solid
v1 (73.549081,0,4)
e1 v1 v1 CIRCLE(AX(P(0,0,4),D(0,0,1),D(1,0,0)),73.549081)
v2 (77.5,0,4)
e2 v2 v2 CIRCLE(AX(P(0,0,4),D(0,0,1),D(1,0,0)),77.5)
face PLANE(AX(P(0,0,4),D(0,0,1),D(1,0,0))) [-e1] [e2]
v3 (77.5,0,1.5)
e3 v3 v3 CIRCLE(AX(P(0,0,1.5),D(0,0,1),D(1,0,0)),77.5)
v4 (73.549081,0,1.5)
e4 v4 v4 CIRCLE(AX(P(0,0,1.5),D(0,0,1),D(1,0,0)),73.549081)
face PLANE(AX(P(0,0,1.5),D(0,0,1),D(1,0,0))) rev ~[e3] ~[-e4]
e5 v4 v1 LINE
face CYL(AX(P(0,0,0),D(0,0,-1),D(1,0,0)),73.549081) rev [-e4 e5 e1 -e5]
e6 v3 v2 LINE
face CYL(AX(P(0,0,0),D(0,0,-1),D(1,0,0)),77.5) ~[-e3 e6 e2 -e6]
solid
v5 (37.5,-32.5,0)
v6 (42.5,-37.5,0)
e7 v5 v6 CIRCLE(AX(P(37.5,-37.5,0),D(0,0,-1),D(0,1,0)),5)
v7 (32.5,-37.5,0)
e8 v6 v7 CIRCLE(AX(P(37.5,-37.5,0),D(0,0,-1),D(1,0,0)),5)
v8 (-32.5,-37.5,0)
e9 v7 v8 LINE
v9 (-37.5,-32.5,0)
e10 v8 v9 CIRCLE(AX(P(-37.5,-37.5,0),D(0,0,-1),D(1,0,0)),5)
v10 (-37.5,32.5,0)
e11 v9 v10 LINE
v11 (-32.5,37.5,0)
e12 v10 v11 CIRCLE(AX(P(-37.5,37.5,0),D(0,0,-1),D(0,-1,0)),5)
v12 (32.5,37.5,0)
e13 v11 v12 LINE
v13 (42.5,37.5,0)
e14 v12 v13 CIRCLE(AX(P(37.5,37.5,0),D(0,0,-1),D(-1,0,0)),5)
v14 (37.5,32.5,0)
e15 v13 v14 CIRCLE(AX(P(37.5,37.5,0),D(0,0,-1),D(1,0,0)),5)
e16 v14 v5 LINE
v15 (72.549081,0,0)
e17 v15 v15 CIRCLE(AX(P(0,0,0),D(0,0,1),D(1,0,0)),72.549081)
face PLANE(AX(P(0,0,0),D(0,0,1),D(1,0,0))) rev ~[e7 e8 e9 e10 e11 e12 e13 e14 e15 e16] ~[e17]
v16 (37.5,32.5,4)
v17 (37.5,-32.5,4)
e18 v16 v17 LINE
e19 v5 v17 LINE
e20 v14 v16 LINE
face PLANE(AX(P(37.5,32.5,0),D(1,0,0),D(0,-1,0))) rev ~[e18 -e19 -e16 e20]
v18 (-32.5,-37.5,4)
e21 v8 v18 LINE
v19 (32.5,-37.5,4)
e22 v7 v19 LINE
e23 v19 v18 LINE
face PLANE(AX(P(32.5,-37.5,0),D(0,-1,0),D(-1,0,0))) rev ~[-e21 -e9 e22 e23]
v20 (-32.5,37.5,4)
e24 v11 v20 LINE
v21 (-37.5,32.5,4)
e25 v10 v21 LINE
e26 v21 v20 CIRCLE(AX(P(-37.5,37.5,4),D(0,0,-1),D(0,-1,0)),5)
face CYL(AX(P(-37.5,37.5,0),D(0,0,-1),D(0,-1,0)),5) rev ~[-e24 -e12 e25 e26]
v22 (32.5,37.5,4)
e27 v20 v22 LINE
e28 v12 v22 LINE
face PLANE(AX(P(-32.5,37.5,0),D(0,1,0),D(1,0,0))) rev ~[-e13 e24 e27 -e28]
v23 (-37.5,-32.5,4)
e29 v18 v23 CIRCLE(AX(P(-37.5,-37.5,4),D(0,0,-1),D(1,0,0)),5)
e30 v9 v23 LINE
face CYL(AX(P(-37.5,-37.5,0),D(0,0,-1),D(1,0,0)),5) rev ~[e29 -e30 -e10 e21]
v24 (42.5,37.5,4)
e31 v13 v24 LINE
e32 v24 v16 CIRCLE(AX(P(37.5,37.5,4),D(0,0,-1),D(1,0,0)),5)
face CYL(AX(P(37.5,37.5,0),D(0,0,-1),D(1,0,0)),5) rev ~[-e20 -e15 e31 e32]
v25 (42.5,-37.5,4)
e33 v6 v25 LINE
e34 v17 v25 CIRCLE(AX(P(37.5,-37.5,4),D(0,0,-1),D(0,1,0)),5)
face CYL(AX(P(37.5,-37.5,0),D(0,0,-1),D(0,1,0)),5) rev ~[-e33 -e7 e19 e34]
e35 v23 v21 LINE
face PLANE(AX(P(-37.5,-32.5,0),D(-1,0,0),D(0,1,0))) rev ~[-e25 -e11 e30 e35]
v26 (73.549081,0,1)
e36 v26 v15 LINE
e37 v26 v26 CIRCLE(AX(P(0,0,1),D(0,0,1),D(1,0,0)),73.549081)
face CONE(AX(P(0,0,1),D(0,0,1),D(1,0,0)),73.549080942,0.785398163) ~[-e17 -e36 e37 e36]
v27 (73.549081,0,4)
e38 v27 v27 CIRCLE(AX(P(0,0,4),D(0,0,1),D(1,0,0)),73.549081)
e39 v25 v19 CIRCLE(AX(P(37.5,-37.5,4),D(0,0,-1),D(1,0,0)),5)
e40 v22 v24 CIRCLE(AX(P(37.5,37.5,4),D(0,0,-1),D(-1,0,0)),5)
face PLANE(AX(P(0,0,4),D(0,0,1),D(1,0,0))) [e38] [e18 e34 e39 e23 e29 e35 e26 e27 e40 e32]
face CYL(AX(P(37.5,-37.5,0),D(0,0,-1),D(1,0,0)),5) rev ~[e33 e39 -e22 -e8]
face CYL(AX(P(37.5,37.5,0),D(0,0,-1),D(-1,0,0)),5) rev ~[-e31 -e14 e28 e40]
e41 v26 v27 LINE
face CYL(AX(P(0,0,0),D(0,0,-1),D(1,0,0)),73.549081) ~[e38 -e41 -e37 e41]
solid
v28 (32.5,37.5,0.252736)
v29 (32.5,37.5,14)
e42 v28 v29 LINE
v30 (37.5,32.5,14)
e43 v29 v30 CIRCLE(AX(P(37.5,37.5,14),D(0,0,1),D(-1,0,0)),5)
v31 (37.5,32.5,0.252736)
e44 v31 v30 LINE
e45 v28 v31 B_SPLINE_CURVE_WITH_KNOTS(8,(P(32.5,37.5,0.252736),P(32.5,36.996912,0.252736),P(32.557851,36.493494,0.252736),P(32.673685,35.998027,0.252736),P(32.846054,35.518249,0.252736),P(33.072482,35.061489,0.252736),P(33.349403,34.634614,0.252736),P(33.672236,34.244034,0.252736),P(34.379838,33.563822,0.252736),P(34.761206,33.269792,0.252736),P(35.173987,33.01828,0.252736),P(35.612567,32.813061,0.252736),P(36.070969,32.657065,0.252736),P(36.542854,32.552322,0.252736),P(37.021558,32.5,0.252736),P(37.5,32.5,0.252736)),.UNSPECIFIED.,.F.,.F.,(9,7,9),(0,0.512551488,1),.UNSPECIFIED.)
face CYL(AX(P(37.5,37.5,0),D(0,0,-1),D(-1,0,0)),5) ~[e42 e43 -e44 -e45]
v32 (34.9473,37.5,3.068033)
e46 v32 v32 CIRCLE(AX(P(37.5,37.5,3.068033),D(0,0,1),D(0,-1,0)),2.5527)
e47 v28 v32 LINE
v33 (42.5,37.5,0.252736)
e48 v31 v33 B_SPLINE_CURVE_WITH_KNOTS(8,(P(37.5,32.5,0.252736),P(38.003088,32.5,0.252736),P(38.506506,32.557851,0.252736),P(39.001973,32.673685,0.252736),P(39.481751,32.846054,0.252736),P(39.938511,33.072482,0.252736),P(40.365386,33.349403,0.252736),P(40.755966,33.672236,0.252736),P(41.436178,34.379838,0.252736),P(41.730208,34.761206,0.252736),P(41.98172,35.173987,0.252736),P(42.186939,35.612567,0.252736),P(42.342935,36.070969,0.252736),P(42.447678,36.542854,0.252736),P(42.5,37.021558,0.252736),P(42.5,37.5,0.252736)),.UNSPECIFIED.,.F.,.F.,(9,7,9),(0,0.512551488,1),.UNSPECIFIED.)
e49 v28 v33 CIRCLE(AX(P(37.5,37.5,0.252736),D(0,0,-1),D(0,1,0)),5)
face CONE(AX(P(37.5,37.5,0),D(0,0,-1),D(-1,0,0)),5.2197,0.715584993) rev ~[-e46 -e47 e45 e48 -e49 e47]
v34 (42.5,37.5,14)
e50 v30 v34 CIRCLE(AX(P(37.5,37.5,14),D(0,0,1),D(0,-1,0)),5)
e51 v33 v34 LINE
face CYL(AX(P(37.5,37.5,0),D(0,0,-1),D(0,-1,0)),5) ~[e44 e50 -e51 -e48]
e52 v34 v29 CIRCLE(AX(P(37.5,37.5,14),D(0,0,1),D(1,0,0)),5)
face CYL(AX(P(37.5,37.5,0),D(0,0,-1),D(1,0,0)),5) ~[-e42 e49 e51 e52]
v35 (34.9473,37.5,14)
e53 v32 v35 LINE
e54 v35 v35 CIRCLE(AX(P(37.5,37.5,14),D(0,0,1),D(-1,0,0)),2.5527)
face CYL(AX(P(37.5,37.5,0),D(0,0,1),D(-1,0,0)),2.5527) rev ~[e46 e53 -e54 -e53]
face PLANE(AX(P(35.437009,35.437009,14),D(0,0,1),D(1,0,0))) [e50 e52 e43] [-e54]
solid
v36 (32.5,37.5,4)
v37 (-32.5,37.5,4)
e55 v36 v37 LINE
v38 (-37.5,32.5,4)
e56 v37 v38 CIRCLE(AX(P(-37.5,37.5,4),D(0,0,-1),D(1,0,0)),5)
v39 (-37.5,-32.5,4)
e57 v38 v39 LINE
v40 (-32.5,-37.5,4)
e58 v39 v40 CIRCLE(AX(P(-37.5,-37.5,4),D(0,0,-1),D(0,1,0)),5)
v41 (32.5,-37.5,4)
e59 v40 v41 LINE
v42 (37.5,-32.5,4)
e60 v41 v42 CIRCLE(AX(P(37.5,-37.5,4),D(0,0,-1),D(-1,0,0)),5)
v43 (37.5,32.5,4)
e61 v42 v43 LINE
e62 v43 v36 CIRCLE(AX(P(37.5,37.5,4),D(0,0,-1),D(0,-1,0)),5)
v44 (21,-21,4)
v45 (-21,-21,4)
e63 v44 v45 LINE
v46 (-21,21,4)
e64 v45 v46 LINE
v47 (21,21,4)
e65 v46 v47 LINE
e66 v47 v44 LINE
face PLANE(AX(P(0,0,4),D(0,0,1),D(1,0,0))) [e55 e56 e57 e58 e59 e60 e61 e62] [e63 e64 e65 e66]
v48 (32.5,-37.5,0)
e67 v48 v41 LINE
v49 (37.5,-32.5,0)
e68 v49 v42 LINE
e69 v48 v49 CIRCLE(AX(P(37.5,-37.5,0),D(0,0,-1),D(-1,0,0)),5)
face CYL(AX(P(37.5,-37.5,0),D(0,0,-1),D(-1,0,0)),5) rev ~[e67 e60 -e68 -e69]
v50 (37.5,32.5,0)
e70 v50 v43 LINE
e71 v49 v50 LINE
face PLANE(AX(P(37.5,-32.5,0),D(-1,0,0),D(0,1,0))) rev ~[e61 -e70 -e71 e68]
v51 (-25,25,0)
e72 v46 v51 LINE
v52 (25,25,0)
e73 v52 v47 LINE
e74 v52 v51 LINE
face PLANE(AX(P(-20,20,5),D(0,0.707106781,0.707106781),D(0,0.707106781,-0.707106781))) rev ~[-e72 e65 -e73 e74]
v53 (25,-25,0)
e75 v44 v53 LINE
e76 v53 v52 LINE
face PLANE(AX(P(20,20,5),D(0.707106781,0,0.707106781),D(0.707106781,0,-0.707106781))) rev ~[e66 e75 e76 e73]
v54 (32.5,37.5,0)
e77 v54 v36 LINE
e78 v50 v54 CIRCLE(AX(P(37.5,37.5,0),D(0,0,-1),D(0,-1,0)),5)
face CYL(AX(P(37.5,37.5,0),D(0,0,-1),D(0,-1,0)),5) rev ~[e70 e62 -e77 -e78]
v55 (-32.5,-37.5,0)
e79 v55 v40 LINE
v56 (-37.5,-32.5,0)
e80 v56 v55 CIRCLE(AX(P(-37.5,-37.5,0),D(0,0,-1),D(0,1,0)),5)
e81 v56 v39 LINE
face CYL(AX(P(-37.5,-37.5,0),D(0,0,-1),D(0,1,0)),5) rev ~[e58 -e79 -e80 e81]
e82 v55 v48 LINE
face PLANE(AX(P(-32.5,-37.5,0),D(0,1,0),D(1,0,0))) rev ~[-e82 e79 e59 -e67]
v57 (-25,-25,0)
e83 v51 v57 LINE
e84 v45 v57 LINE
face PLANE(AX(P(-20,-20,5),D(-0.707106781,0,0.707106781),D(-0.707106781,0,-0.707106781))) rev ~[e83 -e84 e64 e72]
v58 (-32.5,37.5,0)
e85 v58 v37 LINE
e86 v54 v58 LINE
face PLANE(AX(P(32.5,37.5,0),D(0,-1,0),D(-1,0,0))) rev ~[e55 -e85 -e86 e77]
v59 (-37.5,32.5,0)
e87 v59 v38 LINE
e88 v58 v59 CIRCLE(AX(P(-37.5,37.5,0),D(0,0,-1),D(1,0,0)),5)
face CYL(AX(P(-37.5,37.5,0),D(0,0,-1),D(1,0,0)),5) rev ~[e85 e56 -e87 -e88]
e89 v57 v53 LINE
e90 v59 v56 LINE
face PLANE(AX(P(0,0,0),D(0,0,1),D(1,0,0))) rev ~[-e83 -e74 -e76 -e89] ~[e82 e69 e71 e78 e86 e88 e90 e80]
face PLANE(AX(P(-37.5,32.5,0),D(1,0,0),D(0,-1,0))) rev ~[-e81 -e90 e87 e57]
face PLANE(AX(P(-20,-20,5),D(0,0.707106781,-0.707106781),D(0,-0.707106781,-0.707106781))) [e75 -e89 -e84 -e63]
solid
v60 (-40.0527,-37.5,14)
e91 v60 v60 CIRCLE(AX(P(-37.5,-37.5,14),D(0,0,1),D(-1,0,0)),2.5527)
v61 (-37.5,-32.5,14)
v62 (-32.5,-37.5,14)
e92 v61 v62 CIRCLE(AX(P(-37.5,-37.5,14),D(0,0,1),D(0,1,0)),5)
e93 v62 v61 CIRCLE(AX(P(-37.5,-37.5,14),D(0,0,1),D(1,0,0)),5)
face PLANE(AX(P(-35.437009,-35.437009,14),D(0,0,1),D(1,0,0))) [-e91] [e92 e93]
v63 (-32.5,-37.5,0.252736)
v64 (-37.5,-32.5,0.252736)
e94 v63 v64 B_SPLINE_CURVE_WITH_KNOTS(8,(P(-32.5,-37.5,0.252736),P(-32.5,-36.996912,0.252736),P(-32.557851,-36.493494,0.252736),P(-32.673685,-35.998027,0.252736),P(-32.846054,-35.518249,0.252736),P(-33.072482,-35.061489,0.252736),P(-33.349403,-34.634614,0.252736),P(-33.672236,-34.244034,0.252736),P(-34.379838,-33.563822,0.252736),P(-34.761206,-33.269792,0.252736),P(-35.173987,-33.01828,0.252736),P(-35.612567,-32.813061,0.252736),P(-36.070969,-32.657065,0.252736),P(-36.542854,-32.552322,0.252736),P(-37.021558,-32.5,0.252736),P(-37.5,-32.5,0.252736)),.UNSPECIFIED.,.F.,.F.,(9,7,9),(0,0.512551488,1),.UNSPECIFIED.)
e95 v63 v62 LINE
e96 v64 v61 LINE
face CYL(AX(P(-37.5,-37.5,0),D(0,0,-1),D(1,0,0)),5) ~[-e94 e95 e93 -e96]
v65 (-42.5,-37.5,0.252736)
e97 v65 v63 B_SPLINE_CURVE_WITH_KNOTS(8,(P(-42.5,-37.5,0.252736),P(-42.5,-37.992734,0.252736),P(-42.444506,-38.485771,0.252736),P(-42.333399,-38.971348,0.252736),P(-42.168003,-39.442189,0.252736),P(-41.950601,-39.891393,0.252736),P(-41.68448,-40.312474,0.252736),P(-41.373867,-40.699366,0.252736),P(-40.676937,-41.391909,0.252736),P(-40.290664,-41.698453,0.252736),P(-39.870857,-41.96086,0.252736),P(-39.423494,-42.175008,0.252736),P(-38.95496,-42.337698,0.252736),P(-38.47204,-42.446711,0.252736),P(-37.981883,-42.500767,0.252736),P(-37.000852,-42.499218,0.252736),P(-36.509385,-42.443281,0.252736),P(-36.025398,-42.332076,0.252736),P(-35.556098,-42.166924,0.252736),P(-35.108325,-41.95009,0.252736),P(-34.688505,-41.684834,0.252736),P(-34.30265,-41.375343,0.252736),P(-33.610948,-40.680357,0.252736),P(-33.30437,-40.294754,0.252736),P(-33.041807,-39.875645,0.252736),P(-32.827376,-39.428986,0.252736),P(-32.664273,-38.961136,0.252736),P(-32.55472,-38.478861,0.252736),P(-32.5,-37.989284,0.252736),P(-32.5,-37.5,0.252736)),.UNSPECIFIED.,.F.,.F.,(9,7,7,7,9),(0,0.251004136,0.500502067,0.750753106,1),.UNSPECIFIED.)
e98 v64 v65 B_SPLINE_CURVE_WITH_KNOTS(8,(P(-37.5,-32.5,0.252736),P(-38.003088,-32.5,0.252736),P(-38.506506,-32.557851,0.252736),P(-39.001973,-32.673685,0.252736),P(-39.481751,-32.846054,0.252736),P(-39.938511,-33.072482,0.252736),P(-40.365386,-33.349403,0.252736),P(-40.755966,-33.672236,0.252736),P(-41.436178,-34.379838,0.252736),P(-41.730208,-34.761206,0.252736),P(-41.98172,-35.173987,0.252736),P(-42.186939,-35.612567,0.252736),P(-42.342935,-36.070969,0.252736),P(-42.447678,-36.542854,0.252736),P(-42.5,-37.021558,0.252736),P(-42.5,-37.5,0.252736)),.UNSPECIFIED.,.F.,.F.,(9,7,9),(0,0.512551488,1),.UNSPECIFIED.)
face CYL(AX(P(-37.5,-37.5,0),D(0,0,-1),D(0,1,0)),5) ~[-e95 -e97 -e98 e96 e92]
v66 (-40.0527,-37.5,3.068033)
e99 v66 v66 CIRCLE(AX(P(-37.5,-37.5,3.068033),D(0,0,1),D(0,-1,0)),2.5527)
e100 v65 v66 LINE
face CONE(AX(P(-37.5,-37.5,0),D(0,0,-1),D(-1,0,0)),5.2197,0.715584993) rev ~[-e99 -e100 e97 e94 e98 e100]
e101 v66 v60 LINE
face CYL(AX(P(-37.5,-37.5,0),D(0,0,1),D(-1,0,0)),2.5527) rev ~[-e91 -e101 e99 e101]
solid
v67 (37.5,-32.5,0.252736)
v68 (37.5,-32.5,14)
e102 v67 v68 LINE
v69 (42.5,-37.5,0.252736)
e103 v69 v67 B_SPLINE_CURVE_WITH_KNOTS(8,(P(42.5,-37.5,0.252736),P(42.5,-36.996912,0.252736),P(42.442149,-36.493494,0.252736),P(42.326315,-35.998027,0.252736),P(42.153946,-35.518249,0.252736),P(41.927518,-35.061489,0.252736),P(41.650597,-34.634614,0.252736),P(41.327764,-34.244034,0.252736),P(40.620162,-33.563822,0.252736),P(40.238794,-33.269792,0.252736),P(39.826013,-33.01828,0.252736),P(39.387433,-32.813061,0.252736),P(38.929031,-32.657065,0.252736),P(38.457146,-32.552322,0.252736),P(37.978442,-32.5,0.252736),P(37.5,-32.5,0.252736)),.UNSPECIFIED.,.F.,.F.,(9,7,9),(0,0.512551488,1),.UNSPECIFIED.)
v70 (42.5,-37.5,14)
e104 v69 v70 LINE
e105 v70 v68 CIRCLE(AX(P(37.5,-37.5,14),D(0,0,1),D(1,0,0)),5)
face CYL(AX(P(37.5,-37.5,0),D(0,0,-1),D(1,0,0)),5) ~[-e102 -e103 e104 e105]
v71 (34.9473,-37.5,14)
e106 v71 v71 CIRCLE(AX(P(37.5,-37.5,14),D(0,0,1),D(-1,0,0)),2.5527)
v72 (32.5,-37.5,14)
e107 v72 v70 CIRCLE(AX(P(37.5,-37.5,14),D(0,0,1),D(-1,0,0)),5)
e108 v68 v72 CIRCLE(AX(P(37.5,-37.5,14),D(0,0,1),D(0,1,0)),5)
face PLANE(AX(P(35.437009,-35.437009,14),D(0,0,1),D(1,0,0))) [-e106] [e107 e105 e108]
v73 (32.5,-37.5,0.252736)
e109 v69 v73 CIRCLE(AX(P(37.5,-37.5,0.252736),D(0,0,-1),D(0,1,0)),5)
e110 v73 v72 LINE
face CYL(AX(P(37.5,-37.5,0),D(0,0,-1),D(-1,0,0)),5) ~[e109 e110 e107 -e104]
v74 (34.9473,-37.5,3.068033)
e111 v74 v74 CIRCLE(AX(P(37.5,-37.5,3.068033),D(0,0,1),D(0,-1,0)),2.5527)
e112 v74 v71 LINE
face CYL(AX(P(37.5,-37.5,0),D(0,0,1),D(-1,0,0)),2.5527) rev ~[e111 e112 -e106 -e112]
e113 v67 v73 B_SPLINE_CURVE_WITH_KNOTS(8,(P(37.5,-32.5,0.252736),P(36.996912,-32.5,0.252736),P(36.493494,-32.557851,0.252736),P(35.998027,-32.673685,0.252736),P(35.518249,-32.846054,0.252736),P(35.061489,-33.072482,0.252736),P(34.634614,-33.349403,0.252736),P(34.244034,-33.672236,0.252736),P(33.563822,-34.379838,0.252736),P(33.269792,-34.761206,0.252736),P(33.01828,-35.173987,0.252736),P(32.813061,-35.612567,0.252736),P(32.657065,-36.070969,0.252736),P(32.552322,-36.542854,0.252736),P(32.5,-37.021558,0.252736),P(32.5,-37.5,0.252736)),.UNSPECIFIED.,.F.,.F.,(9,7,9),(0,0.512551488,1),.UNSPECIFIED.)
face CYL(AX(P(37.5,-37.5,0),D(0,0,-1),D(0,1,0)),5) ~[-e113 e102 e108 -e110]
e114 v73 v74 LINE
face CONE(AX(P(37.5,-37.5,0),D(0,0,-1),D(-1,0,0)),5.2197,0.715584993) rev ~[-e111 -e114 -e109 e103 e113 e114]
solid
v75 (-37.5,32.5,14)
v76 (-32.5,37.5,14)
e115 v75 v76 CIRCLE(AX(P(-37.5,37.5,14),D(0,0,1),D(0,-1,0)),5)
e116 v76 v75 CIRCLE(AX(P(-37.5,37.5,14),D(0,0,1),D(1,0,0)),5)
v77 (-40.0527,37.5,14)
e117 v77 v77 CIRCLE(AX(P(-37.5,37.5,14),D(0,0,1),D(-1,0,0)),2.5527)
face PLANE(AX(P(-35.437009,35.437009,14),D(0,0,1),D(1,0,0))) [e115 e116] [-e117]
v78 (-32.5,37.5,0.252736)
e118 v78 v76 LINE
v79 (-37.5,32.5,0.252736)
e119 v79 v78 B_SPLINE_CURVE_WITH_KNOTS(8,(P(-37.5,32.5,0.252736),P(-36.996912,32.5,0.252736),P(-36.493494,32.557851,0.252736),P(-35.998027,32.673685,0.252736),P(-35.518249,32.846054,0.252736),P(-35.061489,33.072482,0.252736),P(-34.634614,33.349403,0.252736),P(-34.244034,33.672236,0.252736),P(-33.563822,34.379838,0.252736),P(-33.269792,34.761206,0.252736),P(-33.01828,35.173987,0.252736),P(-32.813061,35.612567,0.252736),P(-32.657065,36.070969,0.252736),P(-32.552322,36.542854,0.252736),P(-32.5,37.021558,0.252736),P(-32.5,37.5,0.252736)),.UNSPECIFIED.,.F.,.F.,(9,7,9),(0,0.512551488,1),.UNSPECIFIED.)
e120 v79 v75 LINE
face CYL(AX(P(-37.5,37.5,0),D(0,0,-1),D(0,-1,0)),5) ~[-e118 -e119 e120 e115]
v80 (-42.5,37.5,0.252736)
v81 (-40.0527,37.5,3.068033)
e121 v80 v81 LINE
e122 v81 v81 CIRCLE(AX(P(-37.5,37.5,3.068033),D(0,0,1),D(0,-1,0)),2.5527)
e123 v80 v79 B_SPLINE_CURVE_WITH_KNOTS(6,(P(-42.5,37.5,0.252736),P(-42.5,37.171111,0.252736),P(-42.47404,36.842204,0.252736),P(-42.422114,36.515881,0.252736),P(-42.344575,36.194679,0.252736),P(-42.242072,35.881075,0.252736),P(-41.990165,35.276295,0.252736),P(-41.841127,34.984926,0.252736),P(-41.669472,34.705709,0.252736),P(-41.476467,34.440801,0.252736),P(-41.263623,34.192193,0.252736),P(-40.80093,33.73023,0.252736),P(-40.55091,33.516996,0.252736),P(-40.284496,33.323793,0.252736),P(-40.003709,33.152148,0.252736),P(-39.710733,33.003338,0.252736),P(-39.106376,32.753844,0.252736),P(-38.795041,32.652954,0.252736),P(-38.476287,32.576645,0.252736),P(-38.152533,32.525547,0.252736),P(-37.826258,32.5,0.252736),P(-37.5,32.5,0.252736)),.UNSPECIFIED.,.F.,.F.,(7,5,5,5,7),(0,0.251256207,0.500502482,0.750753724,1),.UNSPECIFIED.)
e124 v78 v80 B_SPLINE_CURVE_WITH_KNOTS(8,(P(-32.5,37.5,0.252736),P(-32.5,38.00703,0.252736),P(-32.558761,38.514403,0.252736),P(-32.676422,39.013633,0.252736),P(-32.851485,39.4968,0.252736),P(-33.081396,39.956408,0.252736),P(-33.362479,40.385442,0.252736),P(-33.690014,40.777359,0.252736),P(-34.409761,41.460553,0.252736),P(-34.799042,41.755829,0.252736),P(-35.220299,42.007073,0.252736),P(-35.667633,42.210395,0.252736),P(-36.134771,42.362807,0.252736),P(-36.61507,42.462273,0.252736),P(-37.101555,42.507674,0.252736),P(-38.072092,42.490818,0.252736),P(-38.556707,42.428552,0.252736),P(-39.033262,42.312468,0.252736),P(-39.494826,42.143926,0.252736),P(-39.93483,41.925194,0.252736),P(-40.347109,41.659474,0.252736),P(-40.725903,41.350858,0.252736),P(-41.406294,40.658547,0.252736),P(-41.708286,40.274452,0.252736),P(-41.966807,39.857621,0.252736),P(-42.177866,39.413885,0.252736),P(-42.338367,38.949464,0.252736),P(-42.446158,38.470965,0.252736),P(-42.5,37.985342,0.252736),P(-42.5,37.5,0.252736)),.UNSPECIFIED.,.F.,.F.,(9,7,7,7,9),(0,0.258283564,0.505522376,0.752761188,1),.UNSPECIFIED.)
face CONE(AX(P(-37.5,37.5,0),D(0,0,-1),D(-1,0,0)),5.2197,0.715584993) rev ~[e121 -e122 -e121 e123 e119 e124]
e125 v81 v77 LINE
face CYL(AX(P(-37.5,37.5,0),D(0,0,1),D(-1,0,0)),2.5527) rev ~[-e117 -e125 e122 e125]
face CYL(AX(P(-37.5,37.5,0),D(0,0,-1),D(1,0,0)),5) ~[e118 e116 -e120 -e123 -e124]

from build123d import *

# Parameters (mm, degrees)
F1_DEPTH         = 14
F0_W             = 40
F0_H             = 40
F2_DEPTH         = 4
F0_R             = 77.5
F0_R_2           = 73.549080942
F3_DEPTH         = 4
F4_DEPTH         = 4
F5_DEPTH         = 1.5
F6_D             = 5.1054
F6_CSINK_D       = 10.4394
F6_CSINK_ANGLE   = 82
F6_2_D           = 5.1054
F6_2_CSINK_D     = 10.4394
F6_2_CSINK_ANGLE = 82
F6_3_D           = 5.1054
F6_3_CSINK_D     = 10.4394
F6_3_CSINK_ANGLE = 82
F6_4_D           = 5.1054
F6_4_CSINK_D     = 10.4394
F6_4_CSINK_ANGLE = 82
F7_T1_DEPTH      = 40
F7_T3_DEPTH      = 40
F7_T9_DEPTH      = 52.8584149398
F7_T13_DEPTH     = 52.8584149398
F7_T20_DEPTH     = 52.8584149398
F7_T24_DEPTH     = 52.8584149398
F7_T31_DEPTH     = 52.8584149398
F7_T35_DEPTH     = 52.8584149398
F7_T42_DEPTH     = 52.8584149398
F7_T46_DEPTH     = 52.8584149398
F8_SIZE          = 1


# Not quite as in the source:
# - a fillet or chamfer that OpenCascade refuses, or shapes differently, is made with other operations: its cross-section is extruded or revolved along the edge and cut away or added


with BuildPart() as f1:
    # F0 (on Top) → F1 (new body)
    with BuildSketch(Plane.XY):
        with BuildLine():
            ThreePointArc((-32.5, -37.5), (-33.9644660941, -33.9644660941), (-37.5, -32.5))
            Line((-37.5, -32.5), (-37.5, -37.5))
            Line((-37.5, -37.5), (-32.5, -37.5))
        make_face()
        with BuildLine():
            Line((-37.5, -37.5), (-37.5, -32.5))
            ThreePointArc((-37.5, -32.5), (-41.0355339059, -41.0355339059), (-32.5, -37.5))
            Line((-32.5, -37.5), (-37.5, -37.5))
        make_face()
    extrude(amount=F1_DEPTH)

    # F6 (through all)
    with Locations(Plane(origin=(0, 0, 0), x_dir=(1, 0, 0), z_dir=(0, 0, -1))):
        with Locations((-37.5, -37.5), (37.5, -37.5), (37.5, 37.5), (-37.5, 37.5)):
            CounterSinkHole(F6_D / 2, F6_CSINK_D / 2, counter_sink_angle=F6_CSINK_ANGLE)


with BuildPart() as f1b:
    # F0 (on Top) → F1, piece 2 (new body)
    with BuildSketch(Plane.XY):
        with BuildLine():
            ThreePointArc((-37.5, 32.5), (-33.9644660941, 33.9644660941), (-32.5, 37.5))
            Line((-32.5, 37.5), (-37.5, 37.5))
            Line((-37.5, 37.5), (-37.5, 32.5))
        make_face()
        with BuildLine():
            Line((-37.5, 37.5), (-32.5, 37.5))
            ThreePointArc((-32.5, 37.5), (-41.0355339059, 41.0355339059), (-37.5, 32.5))
            Line((-37.5, 32.5), (-37.5, 37.5))
        make_face()
    extrude(amount=F1_DEPTH)

    # F6#2 (through all)
    with Locations(Plane(origin=(0, 0, 0), x_dir=(1, 0, 0), z_dir=(0, 0, -1))):
        with Locations((-37.5, -37.5), (37.5, -37.5), (37.5, 37.5), (-37.5, 37.5)):
            CounterSinkHole(F6_2_D / 2, F6_2_CSINK_D / 2, counter_sink_angle=F6_2_CSINK_ANGLE)


with BuildPart() as f1c:
    # F0 (on Top) → F1, piece 3 (new body)
    with BuildSketch(Plane.XY):
        with BuildLine():
            Line((37.5, -37.5), (37.5, -32.5))
            ThreePointArc((37.5, -32.5), (33.9644660941, -33.9644660941), (32.5, -37.5))
            Line((32.5, -37.5), (37.5, -37.5))
        make_face()
        with BuildLine():
            ThreePointArc((42.5, -37.5), (41.0355339059, -33.9644660941), (37.5, -32.5))
            Line((37.5, -32.5), (37.5, -37.5))
            Line((37.5, -37.5), (32.5, -37.5))
            ThreePointArc((32.5, -37.5), (37.5, -42.5), (42.5, -37.5))
        make_face()
    extrude(amount=F1_DEPTH)

    # F6#3 (through all)
    with Locations(Plane(origin=(0, 0, 0), x_dir=(1, 0, 0), z_dir=(0, 0, -1))):
        with Locations((-37.5, -37.5), (37.5, -37.5), (37.5, 37.5), (-37.5, 37.5)):
            CounterSinkHole(F6_3_D / 2, F6_3_CSINK_D / 2, counter_sink_angle=F6_3_CSINK_ANGLE)


with BuildPart() as f1d:
    # F0 (on Top) → F1, piece 4 (new body)
    with BuildSketch(Plane.XY):
        with BuildLine():
            Line((37.5, 37.5), (32.5, 37.5))
            ThreePointArc((32.5, 37.5), (33.9644660941, 33.9644660941), (37.5, 32.5))
            Line((37.5, 32.5), (37.5, 37.5))
        make_face()
        with BuildLine():
            ThreePointArc((42.5, 37.5), (37.5, 42.5), (32.5, 37.5))
            Line((32.5, 37.5), (37.5, 37.5))
            Line((37.5, 37.5), (37.5, 32.5))
            ThreePointArc((37.5, 32.5), (41.0355339059, 33.9644660941), (42.5, 37.5))
        make_face()
    extrude(amount=F1_DEPTH)

    # F6#4 (through all)
    with Locations(Plane(origin=(0, 0, 0), x_dir=(1, 0, 0), z_dir=(0, 0, -1))):
        with Locations((-37.5, -37.5), (37.5, -37.5), (37.5, 37.5), (-37.5, 37.5)):
            CounterSinkHole(F6_4_D / 2, F6_4_CSINK_D / 2, counter_sink_angle=F6_4_CSINK_ANGLE)


with BuildPart() as f2:
    # F0 (on Top) → F2 (new body)
    with BuildSketch(Plane.XY):
        with BuildLine():
            Line((32.5, 37.5), (-32.5, 37.5))
            ThreePointArc((-32.5, 37.5), (-33.9644660941, 33.9644660941), (-37.5, 32.5))
            Line((-37.5, 32.5), (-37.5, -32.5))
            ThreePointArc((-37.5, -32.5), (-33.9644660941, -33.9644660941), (-32.5, -37.5))
            Line((-32.5, -37.5), (32.5, -37.5))
            ThreePointArc((32.5, -37.5), (33.9644660941, -33.9644660941), (37.5, -32.5))
            Line((37.5, -32.5), (37.5, 32.5))
            ThreePointArc((37.5, 32.5), (33.9644660941, 33.9644660941), (32.5, 37.5))
        make_face()
        Rectangle(F0_W, F0_H, mode=Mode.SUBTRACT)
    extrude(amount=F2_DEPTH)

    # F7: chamfer of 5 on 4 edges, made by hand

    # F7_s2 → F7_t1 (cut)
    with BuildSketch(Plane.YZ.offset(-20)):
        Polygon((-20, 5), (-25, 0), (-20, 0), align=None)
        Polygon((20, 5), (25, 0), (20, 0), align=None)
    extrude(amount=F7_T1_DEPTH, mode=Mode.SUBTRACT)

    # F7_s4 → F7_t3 (cut)
    with BuildSketch(Plane.XZ.offset(-20)):
        Polygon((20, 5), (25, 0), (20, 0), align=None)
        Polygon((-20, 5), (-25, 0), (-20, 0), align=None)
    extrude(amount=F7_T3_DEPTH, mode=Mode.SUBTRACT)


with BuildPart() as f3:
    # F0 (on Top) → F3 (new body)
    with BuildSketch(Plane.XY):
        Circle(F0_R)
        Circle(F0_R_2, mode=Mode.SUBTRACT)
    extrude(amount=F3_DEPTH)

    # F0 (on Top) → F5 (cut)
    with BuildSketch(Plane.XY):
        Circle(F0_R)
        Circle(F0_R_2, mode=Mode.SUBTRACT)
    extrude(amount=F5_DEPTH, mode=Mode.SUBTRACT)


with BuildPart() as f4:
    # F0 (on Top) → F4 (new body)
    with BuildSketch(Plane.XY):
        Circle(F0_R_2)
        with BuildLine():
            ThreePointArc((-37.5, 32.5), (-41.0355339059, 41.0355339059), (-32.5, 37.5))
            Line((-32.5, 37.5), (32.5, 37.5))
            ThreePointArc((32.5, 37.5), (37.5, 42.5), (42.5, 37.5))
            ThreePointArc((42.5, 37.5), (41.0355339059, 33.9644660941), (37.5, 32.5))
            Line((37.5, 32.5), (37.5, -32.5))
            ThreePointArc((37.5, -32.5), (41.0355339059, -33.9644660941), (42.5, -37.5))
            ThreePointArc((42.5, -37.5), (37.5, -42.5), (32.5, -37.5))
            Line((32.5, -37.5), (-32.5, -37.5))
            ThreePointArc((-32.5, -37.5), (-41.0355339059, -41.0355339059), (-37.5, -32.5))
            Line((-37.5, -32.5), (-37.5, 32.5))
        make_face(mode=Mode.SUBTRACT)
    extrude(amount=F4_DEPTH)

    # F8
    f8_edges = [f4.edges().sort_by_distance(p)[0] for p in [
        (-73.549081, 0, 0),
    ]]
    chamfer(f8_edges, length=F8_SIZE)


with BuildPart() as f7_tool7:
    # F7_s8 → F7_t9 (new body)
    with BuildSketch(Plane.XZ.offset(-20)):
        Polygon((20, 5), (25, 0), (20, 0), align=None)
    extrude(amount=F7_T9_DEPTH)

    split(bisect_by=Plane.XZ.offset(20), keep=Keep.TOP)


with BuildPart() as f7_tool11:
    # F7_s12 → F7_t13 (new body)
    with BuildSketch(Plane.YZ.offset(32.8584149398)):
        Polygon((-20, 5), (-25, 0), (-20, 0), align=None)
    extrude(amount=-F7_T13_DEPTH)

    split(bisect_by=Plane.YZ.offset(20), keep=Keep.TOP)


with BuildPart() as f7_tool7_1:
    add(f7_tool7.part)

    # F7_t15: intersect F7_tool11
    add(f7_tool11.part, mode=Mode.INTERSECT)


with BuildPart() as f2_1:
    add(f2.part)

    # F7_t5: cut F7_tool7
    add(f7_tool7_1.part, mode=Mode.SUBTRACT)


with BuildPart() as f7_tool18:
    # F7_s19 → F7_t20 (new body)
    with BuildSketch(Plane.YZ.offset(20)):
        Polygon((-20, 5), (-25, 0), (-20, 0), align=None)
    extrude(amount=-F7_T20_DEPTH)

    split(bisect_by=Plane.YZ.offset(-20), keep=Keep.BOTTOM)


with BuildPart() as f7_tool22:
    # F7_s23 → F7_t24 (new body)
    with BuildSketch(Plane.XZ.offset(32.8584149398)):
        Polygon((-20, 5), (-25, 0), (-20, 0), align=None)
    extrude(amount=-F7_T24_DEPTH)

    split(bisect_by=Plane.XZ.offset(20), keep=Keep.TOP)


with BuildPart() as f7_tool18_1:
    add(f7_tool18.part)

    # F7_t26: intersect F7_tool22
    add(f7_tool22.part, mode=Mode.INTERSECT)


with BuildPart() as f2_2:
    add(f2_1.part)

    # F7_t16: cut F7_tool18
    add(f7_tool18_1.part, mode=Mode.SUBTRACT)


with BuildPart() as f7_tool29:
    # F7_s30 → F7_t31 (new body)
    with BuildSketch(Plane.XZ.offset(-32.8584149398)):
        Polygon((20, 5), (25, 0), (20, 0), align=None)
    extrude(amount=F7_T31_DEPTH)

    split(bisect_by=Plane.XZ.offset(-20), keep=Keep.BOTTOM)


with BuildPart() as f7_tool33:
    # F7_s34 → F7_t35 (new body)
    with BuildSketch(Plane.YZ.offset(-20)):
        Polygon((20, 5), (25, 0), (20, 0), align=None)
    extrude(amount=F7_T35_DEPTH)

    split(bisect_by=Plane.YZ.offset(20), keep=Keep.TOP)


with BuildPart() as f7_tool29_1:
    add(f7_tool29.part)

    # F7_t37: intersect F7_tool33
    add(f7_tool33.part, mode=Mode.INTERSECT)


with BuildPart() as f2_3:
    add(f2_2.part)

    # F7_t27: cut F7_tool29
    add(f7_tool29_1.part, mode=Mode.SUBTRACT)


with BuildPart() as f7_tool40:
    # F7_s41 → F7_t42 (new body)
    with BuildSketch(Plane.XZ.offset(20)):
        Polygon((-20, 5), (-25, 0), (-20, 0), align=None)
    extrude(amount=-F7_T42_DEPTH)

    split(bisect_by=Plane.XZ.offset(-20), keep=Keep.BOTTOM)


with BuildPart() as f7_tool44:
    # F7_s45 → F7_t46 (new body)
    with BuildSketch(Plane.YZ.offset(-32.8584149398)):
        Polygon((20, 5), (25, 0), (20, 0), align=None)
    extrude(amount=F7_T46_DEPTH)

    split(bisect_by=Plane.YZ.offset(-20), keep=Keep.BOTTOM)


with BuildPart() as f7_tool40_1:
    add(f7_tool40.part)

    # F7_t48: intersect F7_tool44
    add(f7_tool44.part, mode=Mode.INTERSECT)


with BuildPart() as f2_4:
    add(f2_3.part)

    # F7_t38: cut F7_tool40
    add(f7_tool40_1.part, mode=Mode.SUBTRACT)


solid = Compound([f1.part, f1b.part, f1c.part, f1d.part, f3.part, f4.part, f2_4.part])
